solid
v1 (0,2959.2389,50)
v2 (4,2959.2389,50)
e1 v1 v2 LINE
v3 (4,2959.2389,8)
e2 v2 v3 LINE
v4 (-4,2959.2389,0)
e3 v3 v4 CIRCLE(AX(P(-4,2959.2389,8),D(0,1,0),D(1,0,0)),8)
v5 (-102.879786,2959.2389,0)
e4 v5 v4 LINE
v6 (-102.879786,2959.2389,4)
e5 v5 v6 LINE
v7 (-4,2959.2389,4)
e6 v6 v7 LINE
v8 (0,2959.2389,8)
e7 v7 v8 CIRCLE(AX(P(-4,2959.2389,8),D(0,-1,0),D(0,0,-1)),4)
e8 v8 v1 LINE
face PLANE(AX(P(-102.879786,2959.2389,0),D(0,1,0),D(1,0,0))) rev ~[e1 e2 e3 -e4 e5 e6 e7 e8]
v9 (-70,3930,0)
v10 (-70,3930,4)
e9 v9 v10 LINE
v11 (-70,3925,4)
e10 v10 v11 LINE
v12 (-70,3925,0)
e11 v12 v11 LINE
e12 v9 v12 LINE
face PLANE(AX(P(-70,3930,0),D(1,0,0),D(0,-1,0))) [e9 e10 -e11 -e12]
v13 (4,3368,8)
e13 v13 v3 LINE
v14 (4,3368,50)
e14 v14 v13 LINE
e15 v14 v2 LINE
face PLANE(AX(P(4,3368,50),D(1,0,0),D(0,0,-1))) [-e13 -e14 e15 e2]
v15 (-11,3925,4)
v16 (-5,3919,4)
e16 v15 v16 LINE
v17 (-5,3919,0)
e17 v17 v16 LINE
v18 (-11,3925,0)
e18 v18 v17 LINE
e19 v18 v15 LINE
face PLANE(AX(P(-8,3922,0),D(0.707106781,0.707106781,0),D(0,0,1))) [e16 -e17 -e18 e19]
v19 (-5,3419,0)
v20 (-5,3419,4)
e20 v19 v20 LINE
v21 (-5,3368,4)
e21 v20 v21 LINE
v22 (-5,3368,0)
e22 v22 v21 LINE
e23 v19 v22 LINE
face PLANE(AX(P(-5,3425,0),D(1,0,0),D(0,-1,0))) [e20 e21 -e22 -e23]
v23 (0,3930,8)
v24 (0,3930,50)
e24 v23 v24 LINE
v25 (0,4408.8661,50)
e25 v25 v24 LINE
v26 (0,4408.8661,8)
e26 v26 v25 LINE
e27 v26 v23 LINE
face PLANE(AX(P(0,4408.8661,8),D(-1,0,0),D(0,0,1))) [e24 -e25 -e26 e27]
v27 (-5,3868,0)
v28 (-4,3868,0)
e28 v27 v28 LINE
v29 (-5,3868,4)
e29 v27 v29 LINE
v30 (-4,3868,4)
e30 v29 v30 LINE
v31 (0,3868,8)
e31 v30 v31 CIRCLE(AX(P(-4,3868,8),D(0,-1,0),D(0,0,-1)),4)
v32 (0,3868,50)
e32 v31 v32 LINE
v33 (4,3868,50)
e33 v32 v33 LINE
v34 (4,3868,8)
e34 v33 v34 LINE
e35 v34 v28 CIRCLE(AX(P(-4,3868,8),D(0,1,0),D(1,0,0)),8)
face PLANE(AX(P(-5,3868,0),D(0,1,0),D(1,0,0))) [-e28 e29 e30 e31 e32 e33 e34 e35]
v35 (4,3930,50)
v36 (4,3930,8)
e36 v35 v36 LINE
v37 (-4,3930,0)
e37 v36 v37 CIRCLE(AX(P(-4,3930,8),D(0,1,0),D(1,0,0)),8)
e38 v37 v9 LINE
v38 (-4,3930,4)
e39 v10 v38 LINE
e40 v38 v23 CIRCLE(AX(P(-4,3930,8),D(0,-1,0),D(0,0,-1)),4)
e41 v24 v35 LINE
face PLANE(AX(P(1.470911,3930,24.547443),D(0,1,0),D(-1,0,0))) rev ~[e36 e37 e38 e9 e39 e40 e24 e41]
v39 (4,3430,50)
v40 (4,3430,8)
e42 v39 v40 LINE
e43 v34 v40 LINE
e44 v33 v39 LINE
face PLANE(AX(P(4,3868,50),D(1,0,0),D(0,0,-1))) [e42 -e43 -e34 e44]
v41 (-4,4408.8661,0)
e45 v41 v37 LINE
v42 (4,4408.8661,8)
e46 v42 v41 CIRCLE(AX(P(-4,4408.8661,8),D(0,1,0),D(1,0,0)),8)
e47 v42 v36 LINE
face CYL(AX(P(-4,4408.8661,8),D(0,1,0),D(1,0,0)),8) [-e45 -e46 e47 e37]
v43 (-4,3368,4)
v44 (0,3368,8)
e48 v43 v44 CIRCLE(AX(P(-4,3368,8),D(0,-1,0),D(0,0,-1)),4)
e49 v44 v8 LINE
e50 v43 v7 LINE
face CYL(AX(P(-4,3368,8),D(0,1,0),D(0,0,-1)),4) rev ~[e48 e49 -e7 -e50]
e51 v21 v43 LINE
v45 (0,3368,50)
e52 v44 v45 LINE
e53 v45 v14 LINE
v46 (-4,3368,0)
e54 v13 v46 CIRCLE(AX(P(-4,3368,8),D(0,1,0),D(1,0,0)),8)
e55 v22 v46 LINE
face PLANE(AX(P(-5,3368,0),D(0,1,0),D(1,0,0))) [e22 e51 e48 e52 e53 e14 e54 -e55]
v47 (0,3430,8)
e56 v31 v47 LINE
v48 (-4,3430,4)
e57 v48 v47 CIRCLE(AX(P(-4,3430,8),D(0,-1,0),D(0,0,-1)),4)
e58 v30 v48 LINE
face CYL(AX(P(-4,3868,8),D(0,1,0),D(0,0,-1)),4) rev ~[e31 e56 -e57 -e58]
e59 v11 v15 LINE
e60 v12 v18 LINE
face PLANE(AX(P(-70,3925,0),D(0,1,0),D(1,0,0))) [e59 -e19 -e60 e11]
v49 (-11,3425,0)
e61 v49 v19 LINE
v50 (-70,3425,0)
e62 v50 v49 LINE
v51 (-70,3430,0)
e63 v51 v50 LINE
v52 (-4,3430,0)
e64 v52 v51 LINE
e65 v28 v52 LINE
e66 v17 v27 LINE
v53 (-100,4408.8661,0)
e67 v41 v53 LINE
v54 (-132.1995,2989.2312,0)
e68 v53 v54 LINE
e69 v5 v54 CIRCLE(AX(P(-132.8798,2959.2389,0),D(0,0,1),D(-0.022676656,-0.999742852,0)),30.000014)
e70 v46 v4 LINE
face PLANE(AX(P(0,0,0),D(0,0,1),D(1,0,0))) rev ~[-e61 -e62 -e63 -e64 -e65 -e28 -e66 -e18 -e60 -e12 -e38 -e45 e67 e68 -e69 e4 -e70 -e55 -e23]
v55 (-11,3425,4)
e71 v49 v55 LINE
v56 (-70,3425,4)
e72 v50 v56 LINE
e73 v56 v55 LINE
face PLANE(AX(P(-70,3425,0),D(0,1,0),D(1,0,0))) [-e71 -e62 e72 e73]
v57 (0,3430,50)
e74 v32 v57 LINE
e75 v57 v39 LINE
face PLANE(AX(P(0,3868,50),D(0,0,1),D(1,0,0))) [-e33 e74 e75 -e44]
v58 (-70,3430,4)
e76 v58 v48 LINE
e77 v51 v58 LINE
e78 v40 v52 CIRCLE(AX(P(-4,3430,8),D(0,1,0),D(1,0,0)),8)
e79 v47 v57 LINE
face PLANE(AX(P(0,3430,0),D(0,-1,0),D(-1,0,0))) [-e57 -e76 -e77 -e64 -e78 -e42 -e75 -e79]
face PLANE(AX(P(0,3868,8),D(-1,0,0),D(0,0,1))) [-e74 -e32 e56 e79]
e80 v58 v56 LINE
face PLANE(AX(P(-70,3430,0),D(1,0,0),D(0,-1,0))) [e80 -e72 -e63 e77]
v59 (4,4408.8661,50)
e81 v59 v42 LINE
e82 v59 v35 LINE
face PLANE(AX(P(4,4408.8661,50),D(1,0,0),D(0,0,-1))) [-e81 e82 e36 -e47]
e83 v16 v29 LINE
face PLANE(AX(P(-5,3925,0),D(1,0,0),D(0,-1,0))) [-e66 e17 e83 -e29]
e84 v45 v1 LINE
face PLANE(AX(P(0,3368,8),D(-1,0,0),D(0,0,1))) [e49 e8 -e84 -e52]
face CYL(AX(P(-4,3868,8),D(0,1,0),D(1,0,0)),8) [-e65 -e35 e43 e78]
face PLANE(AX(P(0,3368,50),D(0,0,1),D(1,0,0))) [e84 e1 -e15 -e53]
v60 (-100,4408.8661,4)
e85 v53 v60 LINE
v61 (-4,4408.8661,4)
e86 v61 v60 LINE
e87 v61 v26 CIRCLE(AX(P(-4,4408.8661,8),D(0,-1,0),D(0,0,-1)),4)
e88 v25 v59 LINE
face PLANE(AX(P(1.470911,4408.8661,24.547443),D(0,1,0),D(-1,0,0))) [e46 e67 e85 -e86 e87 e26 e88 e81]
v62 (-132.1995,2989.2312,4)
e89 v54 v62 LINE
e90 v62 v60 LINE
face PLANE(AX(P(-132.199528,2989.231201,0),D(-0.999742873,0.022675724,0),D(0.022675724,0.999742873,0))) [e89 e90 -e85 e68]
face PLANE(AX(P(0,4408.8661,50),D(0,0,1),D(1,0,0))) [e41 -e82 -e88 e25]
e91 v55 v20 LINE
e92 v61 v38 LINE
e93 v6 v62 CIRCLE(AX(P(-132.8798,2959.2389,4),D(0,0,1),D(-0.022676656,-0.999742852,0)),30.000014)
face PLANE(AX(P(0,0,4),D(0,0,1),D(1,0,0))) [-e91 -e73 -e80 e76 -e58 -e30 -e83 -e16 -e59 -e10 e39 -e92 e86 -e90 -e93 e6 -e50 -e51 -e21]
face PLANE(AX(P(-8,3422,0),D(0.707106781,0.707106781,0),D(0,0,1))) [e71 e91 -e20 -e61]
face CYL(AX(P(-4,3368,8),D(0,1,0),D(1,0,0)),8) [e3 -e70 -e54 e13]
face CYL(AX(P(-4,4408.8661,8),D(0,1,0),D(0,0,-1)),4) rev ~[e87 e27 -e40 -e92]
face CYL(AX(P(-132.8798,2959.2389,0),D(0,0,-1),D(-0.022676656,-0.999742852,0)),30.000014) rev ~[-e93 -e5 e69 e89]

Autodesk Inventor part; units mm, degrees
ref_plane "YZ Plane" through (0, 0, 0) normal (1, 0, 0) x (0, 1, 0)
ref_plane "XZ Plane" through (0, 0, 0) normal (0, 1, 0) x (-1, 0, 0)
ref_plane "XY Plane" through (0, 0, 0) normal (0, 0, 1) x (1, 0, 0)
sketch "Sketch1" plane through (0, 0, 0) normal (0, 0, 1) x (1, 0, 0)
  line L0 (0, 0) -> (0, 1479.6195)
  line L1 (0, 1479.6195) -> (-166.4399, 1479.6195)
  line L2 (-166.4399, 1479.6195) -> (-200, 0)
  line L3 (-200, 0) -> (0, 0)
  line L4 (0, 430) -> (-5, 430)
  line L5 (-5, 430) -> (-5, 368)
  line L6 (-5, 368) -> (0, 368)
  line L7 (0, 368) -> (0, 430)
  line L8 (-5, 430) -> (-70, 430)
  line L9 (-70, 430) -> (-70, 425)
  line L10 (-70, 425) -> (-5, 425)
  line L11 (-5, 425) -> (-5, 430)
  line L12 (-70, 430) -> (-190.2469, 430) construction
  line L13 (0, 4408.8661) -> (0, 1479.6195)
  line L14 (-166.4399, 1479.6195) -> (-132.8798, 2959.2389)
  line L15 (0, 4408.8661) -> (-100, 4408.8661)
  line L16 (-132.8798, 2959.2389) -> (0, 2959.2389)
  line L17 (-132.8798, 2959.2389) -> (-100, 4408.8661)
  line L18 (-5, 868) -> (0, 868)
  line L19 (-70, 925) -> (-5, 925)
  line L20 (-5, 930) -> (-70, 930)
  line L21 (-70, 930) -> (-70, 925)
  line L22 (-5, 925) -> (-5, 930)
  line L23 (-5, 930) -> (-5, 868)
  line L24 (0, 868) -> (0, 930)
  line L25 (0, 930) -> (-5, 930)
  line L26 (-5, 1368) -> (0, 1368)
  line L27 (-70, 1425) -> (-5, 1425)
  line L28 (-5, 1430) -> (-70, 1430)
  line L29 (-70, 1430) -> (-70, 1425)
  line L30 (-5, 1425) -> (-5, 1430)
  line L31 (-5, 1430) -> (-5, 1368)
  line L32 (0, 1368) -> (0, 1430)
  line L33 (0, 1430) -> (-5, 1430)
  line L34 (-5, 1868) -> (0, 1868)
  line L35 (-70, 1925) -> (-5, 1925)
  line L36 (-5, 1930) -> (-70, 1930)
  line L37 (-70, 1930) -> (-70, 1925)
  line L38 (-5, 1925) -> (-5, 1930)
  line L39 (-5, 1930) -> (-5, 1868)
  line L40 (0, 1868) -> (0, 1930)
  line L41 (0, 1930) -> (-5, 1930)
  line L42 (-5, 2368) -> (0, 2368)
  line L43 (-70, 2425) -> (-5, 2425)
  line L44 (-5, 2430) -> (-70, 2430)
  line L45 (-70, 2430) -> (-70, 2425)
  line L46 (-5, 2425) -> (-5, 2430)
  line L47 (-5, 2430) -> (-5, 2368)
  line L48 (0, 2368) -> (0, 2430)
  line L49 (0, 2430) -> (-5, 2430)
  line L50 (-5, 2868) -> (0, 2868)
  line L51 (-70, 2925) -> (-5, 2925)
  line L52 (-5, 2930) -> (-70, 2930)
  line L53 (-70, 2930) -> (-70, 2925)
  line L54 (-5, 2925) -> (-5, 2930)
  line L55 (-5, 2930) -> (-5, 2868)
  line L56 (0, 2868) -> (0, 2930)
  line L57 (0, 2930) -> (-5, 2930)
  line L58 (-100, 4408.8661) -> (-99.3197, 4438.8584) construction
  line L59 (0, 1629.6195) -> (-163.0377, 1629.6195)
  line L60 (-131.0653, 3039.2389) -> (0, 3039.2389)
  line L61 (-5, 3368) -> (0, 3368)
  line L62 (-70, 3425) -> (-5, 3425)
  line L63 (-5, 3430) -> (-70, 3430)
  line L64 (-70, 3430) -> (-70, 3425)
  line L65 (-5, 3425) -> (-5, 3430)
  line L66 (-5, 3430) -> (-5, 3368)
  line L67 (0, 3368) -> (0, 3430)
  line L68 (0, 3430) -> (-5, 3430)
  line L69 (-5, 3868) -> (0, 3868)
  line L70 (-70, 3925) -> (-5, 3925)
  line L71 (-5, 3930) -> (-70, 3930)
  line L72 (-70, 3930) -> (-70, 3925)
  line L73 (-5, 3925) -> (-5, 3930)
  line L74 (-5, 3930) -> (-5, 3868)
  line L75 (0, 3868) -> (0, 3930)
  line L76 (0, 3930) -> (-5, 3930)
  arc A0 (-140, 0) -> (-198.6395, 59.9846) centre (-200, 0) ccw
  arc A1 (-167.1202, 1449.6272) -> (-165.7596, 1509.6117) centre (-166.4399, 1479.6195) ccw
  arc A2 (-133.5601, 2929.2466) -> (-132.1995, 2989.2312) centre (-132.8798, 2959.2389) ccw
  line L77 (0, 930) -> (-70, 930)
  line L78 (-70, 930) -> (-178.9061, 930) construction
  line L79 (-70, 1430) -> (-167.5654, 1430) construction
  line L80 (-70, 1930) -> (-156.2246, 1930) construction
  line L81 (-70, 2430) -> (-144.8838, 2430) construction
  line L82 (-70, 2930) -> (-133.543, 2930) construction
  line L83 (-70, 3430) -> (-122.2022, 3430) construction
  line L84 (-70, 3930) -> (-110.8614, 3930) construction
  point P0 (0, 430)
  point P1 (-136.4399, 1479.6195)
  point P2 (0, 2368)
  point P3 (0, 2868)
  point P4 (0, 1868)
  point P5 (-102.8798, 2959.2389)
  point P6 (0, 3368)
  point P7 (0, 3868)
  dimension "d25" = 430
  dimension "d32" = 1480
  dimension "d33" = 1480
  dimension "d34" = 1450
  dimension "d35" = 100
  dimension "d38" = 500
  dimension "d44" = 30
  dimension "d45" = 150
  dimension "d46" = 80
  dimension "d47" = 200
  dimension "d48" = 5
  dimension "d50" = 62
  dimension "d51" = 60
  dimension "d52" = 30
  dimension "d53" = 478.8661
  dimension "d54" = 30
  dimension "d56" = 190.2469
  dimension "d57" = 178.9061
  dimension "d58" = 167.5654
  dimension "d59" = 156.2246
  dimension "d60" = 144.8838
  dimension "d61" = 133.543
  dimension "d62" = 122.2022
  dimension "d63" = 110.8614
  dimension "d64" = 70
extrude "Plate1" add sketch "Sketch1" along normal blind 4 contours A2 L17 L60 L13 L16 | L17 L15 L13 L76 L71 L72 L70 L74 L69 L68 L63 L64 L62 L66 L61 L60
sketch "Sketch2" plane through (4, 4408.8661, 0) normal (-1, 0, 0) x (0, -1, 0)
  line L0 (478.8661, 0) -> (0, 0)
  line L1 (0, 0) -> (0, 50)
  line L2 (0, 50) -> (478.8661, 50)
  line L3 (478.8661, 50) -> (478.8661, 0)
edge flange "Flange1" height 50 angle 90 thickness 4 bend radius 4 thickness toward (-1, 0, 0) relief tear relief width 4 relief depth 2 corner gap 4 corner form 0 edges at (0, 4169.433, 4) (0, 3649, 4) (0, 3163.6195, 4) wall of the first edge with corners at (4, 3930, 0) (4, 4408.8661, 0) (4, 4408.8661, 50) (4, 3930, 50)
bend "Bend1"
corner "Corner1"
chamfer "Corner Chamfer1" distance 6 angle 45 2 edges at (-5, 3425, 2) (-5, 3925, 2)
equation "\"d5\" = Thickness"
equation "\"d7\" = BendReliefWidth"
equation "\"d8\" = BendReliefDepth"
equation "\"d9\" = MinimumRemnant"
equation "\"d10\" = TransitionRadius"
equation "\"d13\" = BendRadius"
equation "\"d14\" = CornerReliefSize"
equation "\"d15\" = GapSize"
equation "\"d16\" = JacobiRadiusSize"
equation "\"BendRadius\" = Thickness"
equation "\"BendReliefWidth\" = Thickness"
equation "\"BendReliefDepth\" = 0.5 * Thickness"
equation "\"CornerReliefSize\" = 4 * Thickness"
equation "\"MinimumRemnant\" = 2 * Thickness"
equation "\"TransitionRadius\" = BendRadius"
equation "\"JacobiRadiusSize\" = BendRadius"
equation "\"GapSize\" = Thickness"
equation "\"Thickness\" = 4"
properties part number "03.1 GBK main3  rib" material "Steel"
